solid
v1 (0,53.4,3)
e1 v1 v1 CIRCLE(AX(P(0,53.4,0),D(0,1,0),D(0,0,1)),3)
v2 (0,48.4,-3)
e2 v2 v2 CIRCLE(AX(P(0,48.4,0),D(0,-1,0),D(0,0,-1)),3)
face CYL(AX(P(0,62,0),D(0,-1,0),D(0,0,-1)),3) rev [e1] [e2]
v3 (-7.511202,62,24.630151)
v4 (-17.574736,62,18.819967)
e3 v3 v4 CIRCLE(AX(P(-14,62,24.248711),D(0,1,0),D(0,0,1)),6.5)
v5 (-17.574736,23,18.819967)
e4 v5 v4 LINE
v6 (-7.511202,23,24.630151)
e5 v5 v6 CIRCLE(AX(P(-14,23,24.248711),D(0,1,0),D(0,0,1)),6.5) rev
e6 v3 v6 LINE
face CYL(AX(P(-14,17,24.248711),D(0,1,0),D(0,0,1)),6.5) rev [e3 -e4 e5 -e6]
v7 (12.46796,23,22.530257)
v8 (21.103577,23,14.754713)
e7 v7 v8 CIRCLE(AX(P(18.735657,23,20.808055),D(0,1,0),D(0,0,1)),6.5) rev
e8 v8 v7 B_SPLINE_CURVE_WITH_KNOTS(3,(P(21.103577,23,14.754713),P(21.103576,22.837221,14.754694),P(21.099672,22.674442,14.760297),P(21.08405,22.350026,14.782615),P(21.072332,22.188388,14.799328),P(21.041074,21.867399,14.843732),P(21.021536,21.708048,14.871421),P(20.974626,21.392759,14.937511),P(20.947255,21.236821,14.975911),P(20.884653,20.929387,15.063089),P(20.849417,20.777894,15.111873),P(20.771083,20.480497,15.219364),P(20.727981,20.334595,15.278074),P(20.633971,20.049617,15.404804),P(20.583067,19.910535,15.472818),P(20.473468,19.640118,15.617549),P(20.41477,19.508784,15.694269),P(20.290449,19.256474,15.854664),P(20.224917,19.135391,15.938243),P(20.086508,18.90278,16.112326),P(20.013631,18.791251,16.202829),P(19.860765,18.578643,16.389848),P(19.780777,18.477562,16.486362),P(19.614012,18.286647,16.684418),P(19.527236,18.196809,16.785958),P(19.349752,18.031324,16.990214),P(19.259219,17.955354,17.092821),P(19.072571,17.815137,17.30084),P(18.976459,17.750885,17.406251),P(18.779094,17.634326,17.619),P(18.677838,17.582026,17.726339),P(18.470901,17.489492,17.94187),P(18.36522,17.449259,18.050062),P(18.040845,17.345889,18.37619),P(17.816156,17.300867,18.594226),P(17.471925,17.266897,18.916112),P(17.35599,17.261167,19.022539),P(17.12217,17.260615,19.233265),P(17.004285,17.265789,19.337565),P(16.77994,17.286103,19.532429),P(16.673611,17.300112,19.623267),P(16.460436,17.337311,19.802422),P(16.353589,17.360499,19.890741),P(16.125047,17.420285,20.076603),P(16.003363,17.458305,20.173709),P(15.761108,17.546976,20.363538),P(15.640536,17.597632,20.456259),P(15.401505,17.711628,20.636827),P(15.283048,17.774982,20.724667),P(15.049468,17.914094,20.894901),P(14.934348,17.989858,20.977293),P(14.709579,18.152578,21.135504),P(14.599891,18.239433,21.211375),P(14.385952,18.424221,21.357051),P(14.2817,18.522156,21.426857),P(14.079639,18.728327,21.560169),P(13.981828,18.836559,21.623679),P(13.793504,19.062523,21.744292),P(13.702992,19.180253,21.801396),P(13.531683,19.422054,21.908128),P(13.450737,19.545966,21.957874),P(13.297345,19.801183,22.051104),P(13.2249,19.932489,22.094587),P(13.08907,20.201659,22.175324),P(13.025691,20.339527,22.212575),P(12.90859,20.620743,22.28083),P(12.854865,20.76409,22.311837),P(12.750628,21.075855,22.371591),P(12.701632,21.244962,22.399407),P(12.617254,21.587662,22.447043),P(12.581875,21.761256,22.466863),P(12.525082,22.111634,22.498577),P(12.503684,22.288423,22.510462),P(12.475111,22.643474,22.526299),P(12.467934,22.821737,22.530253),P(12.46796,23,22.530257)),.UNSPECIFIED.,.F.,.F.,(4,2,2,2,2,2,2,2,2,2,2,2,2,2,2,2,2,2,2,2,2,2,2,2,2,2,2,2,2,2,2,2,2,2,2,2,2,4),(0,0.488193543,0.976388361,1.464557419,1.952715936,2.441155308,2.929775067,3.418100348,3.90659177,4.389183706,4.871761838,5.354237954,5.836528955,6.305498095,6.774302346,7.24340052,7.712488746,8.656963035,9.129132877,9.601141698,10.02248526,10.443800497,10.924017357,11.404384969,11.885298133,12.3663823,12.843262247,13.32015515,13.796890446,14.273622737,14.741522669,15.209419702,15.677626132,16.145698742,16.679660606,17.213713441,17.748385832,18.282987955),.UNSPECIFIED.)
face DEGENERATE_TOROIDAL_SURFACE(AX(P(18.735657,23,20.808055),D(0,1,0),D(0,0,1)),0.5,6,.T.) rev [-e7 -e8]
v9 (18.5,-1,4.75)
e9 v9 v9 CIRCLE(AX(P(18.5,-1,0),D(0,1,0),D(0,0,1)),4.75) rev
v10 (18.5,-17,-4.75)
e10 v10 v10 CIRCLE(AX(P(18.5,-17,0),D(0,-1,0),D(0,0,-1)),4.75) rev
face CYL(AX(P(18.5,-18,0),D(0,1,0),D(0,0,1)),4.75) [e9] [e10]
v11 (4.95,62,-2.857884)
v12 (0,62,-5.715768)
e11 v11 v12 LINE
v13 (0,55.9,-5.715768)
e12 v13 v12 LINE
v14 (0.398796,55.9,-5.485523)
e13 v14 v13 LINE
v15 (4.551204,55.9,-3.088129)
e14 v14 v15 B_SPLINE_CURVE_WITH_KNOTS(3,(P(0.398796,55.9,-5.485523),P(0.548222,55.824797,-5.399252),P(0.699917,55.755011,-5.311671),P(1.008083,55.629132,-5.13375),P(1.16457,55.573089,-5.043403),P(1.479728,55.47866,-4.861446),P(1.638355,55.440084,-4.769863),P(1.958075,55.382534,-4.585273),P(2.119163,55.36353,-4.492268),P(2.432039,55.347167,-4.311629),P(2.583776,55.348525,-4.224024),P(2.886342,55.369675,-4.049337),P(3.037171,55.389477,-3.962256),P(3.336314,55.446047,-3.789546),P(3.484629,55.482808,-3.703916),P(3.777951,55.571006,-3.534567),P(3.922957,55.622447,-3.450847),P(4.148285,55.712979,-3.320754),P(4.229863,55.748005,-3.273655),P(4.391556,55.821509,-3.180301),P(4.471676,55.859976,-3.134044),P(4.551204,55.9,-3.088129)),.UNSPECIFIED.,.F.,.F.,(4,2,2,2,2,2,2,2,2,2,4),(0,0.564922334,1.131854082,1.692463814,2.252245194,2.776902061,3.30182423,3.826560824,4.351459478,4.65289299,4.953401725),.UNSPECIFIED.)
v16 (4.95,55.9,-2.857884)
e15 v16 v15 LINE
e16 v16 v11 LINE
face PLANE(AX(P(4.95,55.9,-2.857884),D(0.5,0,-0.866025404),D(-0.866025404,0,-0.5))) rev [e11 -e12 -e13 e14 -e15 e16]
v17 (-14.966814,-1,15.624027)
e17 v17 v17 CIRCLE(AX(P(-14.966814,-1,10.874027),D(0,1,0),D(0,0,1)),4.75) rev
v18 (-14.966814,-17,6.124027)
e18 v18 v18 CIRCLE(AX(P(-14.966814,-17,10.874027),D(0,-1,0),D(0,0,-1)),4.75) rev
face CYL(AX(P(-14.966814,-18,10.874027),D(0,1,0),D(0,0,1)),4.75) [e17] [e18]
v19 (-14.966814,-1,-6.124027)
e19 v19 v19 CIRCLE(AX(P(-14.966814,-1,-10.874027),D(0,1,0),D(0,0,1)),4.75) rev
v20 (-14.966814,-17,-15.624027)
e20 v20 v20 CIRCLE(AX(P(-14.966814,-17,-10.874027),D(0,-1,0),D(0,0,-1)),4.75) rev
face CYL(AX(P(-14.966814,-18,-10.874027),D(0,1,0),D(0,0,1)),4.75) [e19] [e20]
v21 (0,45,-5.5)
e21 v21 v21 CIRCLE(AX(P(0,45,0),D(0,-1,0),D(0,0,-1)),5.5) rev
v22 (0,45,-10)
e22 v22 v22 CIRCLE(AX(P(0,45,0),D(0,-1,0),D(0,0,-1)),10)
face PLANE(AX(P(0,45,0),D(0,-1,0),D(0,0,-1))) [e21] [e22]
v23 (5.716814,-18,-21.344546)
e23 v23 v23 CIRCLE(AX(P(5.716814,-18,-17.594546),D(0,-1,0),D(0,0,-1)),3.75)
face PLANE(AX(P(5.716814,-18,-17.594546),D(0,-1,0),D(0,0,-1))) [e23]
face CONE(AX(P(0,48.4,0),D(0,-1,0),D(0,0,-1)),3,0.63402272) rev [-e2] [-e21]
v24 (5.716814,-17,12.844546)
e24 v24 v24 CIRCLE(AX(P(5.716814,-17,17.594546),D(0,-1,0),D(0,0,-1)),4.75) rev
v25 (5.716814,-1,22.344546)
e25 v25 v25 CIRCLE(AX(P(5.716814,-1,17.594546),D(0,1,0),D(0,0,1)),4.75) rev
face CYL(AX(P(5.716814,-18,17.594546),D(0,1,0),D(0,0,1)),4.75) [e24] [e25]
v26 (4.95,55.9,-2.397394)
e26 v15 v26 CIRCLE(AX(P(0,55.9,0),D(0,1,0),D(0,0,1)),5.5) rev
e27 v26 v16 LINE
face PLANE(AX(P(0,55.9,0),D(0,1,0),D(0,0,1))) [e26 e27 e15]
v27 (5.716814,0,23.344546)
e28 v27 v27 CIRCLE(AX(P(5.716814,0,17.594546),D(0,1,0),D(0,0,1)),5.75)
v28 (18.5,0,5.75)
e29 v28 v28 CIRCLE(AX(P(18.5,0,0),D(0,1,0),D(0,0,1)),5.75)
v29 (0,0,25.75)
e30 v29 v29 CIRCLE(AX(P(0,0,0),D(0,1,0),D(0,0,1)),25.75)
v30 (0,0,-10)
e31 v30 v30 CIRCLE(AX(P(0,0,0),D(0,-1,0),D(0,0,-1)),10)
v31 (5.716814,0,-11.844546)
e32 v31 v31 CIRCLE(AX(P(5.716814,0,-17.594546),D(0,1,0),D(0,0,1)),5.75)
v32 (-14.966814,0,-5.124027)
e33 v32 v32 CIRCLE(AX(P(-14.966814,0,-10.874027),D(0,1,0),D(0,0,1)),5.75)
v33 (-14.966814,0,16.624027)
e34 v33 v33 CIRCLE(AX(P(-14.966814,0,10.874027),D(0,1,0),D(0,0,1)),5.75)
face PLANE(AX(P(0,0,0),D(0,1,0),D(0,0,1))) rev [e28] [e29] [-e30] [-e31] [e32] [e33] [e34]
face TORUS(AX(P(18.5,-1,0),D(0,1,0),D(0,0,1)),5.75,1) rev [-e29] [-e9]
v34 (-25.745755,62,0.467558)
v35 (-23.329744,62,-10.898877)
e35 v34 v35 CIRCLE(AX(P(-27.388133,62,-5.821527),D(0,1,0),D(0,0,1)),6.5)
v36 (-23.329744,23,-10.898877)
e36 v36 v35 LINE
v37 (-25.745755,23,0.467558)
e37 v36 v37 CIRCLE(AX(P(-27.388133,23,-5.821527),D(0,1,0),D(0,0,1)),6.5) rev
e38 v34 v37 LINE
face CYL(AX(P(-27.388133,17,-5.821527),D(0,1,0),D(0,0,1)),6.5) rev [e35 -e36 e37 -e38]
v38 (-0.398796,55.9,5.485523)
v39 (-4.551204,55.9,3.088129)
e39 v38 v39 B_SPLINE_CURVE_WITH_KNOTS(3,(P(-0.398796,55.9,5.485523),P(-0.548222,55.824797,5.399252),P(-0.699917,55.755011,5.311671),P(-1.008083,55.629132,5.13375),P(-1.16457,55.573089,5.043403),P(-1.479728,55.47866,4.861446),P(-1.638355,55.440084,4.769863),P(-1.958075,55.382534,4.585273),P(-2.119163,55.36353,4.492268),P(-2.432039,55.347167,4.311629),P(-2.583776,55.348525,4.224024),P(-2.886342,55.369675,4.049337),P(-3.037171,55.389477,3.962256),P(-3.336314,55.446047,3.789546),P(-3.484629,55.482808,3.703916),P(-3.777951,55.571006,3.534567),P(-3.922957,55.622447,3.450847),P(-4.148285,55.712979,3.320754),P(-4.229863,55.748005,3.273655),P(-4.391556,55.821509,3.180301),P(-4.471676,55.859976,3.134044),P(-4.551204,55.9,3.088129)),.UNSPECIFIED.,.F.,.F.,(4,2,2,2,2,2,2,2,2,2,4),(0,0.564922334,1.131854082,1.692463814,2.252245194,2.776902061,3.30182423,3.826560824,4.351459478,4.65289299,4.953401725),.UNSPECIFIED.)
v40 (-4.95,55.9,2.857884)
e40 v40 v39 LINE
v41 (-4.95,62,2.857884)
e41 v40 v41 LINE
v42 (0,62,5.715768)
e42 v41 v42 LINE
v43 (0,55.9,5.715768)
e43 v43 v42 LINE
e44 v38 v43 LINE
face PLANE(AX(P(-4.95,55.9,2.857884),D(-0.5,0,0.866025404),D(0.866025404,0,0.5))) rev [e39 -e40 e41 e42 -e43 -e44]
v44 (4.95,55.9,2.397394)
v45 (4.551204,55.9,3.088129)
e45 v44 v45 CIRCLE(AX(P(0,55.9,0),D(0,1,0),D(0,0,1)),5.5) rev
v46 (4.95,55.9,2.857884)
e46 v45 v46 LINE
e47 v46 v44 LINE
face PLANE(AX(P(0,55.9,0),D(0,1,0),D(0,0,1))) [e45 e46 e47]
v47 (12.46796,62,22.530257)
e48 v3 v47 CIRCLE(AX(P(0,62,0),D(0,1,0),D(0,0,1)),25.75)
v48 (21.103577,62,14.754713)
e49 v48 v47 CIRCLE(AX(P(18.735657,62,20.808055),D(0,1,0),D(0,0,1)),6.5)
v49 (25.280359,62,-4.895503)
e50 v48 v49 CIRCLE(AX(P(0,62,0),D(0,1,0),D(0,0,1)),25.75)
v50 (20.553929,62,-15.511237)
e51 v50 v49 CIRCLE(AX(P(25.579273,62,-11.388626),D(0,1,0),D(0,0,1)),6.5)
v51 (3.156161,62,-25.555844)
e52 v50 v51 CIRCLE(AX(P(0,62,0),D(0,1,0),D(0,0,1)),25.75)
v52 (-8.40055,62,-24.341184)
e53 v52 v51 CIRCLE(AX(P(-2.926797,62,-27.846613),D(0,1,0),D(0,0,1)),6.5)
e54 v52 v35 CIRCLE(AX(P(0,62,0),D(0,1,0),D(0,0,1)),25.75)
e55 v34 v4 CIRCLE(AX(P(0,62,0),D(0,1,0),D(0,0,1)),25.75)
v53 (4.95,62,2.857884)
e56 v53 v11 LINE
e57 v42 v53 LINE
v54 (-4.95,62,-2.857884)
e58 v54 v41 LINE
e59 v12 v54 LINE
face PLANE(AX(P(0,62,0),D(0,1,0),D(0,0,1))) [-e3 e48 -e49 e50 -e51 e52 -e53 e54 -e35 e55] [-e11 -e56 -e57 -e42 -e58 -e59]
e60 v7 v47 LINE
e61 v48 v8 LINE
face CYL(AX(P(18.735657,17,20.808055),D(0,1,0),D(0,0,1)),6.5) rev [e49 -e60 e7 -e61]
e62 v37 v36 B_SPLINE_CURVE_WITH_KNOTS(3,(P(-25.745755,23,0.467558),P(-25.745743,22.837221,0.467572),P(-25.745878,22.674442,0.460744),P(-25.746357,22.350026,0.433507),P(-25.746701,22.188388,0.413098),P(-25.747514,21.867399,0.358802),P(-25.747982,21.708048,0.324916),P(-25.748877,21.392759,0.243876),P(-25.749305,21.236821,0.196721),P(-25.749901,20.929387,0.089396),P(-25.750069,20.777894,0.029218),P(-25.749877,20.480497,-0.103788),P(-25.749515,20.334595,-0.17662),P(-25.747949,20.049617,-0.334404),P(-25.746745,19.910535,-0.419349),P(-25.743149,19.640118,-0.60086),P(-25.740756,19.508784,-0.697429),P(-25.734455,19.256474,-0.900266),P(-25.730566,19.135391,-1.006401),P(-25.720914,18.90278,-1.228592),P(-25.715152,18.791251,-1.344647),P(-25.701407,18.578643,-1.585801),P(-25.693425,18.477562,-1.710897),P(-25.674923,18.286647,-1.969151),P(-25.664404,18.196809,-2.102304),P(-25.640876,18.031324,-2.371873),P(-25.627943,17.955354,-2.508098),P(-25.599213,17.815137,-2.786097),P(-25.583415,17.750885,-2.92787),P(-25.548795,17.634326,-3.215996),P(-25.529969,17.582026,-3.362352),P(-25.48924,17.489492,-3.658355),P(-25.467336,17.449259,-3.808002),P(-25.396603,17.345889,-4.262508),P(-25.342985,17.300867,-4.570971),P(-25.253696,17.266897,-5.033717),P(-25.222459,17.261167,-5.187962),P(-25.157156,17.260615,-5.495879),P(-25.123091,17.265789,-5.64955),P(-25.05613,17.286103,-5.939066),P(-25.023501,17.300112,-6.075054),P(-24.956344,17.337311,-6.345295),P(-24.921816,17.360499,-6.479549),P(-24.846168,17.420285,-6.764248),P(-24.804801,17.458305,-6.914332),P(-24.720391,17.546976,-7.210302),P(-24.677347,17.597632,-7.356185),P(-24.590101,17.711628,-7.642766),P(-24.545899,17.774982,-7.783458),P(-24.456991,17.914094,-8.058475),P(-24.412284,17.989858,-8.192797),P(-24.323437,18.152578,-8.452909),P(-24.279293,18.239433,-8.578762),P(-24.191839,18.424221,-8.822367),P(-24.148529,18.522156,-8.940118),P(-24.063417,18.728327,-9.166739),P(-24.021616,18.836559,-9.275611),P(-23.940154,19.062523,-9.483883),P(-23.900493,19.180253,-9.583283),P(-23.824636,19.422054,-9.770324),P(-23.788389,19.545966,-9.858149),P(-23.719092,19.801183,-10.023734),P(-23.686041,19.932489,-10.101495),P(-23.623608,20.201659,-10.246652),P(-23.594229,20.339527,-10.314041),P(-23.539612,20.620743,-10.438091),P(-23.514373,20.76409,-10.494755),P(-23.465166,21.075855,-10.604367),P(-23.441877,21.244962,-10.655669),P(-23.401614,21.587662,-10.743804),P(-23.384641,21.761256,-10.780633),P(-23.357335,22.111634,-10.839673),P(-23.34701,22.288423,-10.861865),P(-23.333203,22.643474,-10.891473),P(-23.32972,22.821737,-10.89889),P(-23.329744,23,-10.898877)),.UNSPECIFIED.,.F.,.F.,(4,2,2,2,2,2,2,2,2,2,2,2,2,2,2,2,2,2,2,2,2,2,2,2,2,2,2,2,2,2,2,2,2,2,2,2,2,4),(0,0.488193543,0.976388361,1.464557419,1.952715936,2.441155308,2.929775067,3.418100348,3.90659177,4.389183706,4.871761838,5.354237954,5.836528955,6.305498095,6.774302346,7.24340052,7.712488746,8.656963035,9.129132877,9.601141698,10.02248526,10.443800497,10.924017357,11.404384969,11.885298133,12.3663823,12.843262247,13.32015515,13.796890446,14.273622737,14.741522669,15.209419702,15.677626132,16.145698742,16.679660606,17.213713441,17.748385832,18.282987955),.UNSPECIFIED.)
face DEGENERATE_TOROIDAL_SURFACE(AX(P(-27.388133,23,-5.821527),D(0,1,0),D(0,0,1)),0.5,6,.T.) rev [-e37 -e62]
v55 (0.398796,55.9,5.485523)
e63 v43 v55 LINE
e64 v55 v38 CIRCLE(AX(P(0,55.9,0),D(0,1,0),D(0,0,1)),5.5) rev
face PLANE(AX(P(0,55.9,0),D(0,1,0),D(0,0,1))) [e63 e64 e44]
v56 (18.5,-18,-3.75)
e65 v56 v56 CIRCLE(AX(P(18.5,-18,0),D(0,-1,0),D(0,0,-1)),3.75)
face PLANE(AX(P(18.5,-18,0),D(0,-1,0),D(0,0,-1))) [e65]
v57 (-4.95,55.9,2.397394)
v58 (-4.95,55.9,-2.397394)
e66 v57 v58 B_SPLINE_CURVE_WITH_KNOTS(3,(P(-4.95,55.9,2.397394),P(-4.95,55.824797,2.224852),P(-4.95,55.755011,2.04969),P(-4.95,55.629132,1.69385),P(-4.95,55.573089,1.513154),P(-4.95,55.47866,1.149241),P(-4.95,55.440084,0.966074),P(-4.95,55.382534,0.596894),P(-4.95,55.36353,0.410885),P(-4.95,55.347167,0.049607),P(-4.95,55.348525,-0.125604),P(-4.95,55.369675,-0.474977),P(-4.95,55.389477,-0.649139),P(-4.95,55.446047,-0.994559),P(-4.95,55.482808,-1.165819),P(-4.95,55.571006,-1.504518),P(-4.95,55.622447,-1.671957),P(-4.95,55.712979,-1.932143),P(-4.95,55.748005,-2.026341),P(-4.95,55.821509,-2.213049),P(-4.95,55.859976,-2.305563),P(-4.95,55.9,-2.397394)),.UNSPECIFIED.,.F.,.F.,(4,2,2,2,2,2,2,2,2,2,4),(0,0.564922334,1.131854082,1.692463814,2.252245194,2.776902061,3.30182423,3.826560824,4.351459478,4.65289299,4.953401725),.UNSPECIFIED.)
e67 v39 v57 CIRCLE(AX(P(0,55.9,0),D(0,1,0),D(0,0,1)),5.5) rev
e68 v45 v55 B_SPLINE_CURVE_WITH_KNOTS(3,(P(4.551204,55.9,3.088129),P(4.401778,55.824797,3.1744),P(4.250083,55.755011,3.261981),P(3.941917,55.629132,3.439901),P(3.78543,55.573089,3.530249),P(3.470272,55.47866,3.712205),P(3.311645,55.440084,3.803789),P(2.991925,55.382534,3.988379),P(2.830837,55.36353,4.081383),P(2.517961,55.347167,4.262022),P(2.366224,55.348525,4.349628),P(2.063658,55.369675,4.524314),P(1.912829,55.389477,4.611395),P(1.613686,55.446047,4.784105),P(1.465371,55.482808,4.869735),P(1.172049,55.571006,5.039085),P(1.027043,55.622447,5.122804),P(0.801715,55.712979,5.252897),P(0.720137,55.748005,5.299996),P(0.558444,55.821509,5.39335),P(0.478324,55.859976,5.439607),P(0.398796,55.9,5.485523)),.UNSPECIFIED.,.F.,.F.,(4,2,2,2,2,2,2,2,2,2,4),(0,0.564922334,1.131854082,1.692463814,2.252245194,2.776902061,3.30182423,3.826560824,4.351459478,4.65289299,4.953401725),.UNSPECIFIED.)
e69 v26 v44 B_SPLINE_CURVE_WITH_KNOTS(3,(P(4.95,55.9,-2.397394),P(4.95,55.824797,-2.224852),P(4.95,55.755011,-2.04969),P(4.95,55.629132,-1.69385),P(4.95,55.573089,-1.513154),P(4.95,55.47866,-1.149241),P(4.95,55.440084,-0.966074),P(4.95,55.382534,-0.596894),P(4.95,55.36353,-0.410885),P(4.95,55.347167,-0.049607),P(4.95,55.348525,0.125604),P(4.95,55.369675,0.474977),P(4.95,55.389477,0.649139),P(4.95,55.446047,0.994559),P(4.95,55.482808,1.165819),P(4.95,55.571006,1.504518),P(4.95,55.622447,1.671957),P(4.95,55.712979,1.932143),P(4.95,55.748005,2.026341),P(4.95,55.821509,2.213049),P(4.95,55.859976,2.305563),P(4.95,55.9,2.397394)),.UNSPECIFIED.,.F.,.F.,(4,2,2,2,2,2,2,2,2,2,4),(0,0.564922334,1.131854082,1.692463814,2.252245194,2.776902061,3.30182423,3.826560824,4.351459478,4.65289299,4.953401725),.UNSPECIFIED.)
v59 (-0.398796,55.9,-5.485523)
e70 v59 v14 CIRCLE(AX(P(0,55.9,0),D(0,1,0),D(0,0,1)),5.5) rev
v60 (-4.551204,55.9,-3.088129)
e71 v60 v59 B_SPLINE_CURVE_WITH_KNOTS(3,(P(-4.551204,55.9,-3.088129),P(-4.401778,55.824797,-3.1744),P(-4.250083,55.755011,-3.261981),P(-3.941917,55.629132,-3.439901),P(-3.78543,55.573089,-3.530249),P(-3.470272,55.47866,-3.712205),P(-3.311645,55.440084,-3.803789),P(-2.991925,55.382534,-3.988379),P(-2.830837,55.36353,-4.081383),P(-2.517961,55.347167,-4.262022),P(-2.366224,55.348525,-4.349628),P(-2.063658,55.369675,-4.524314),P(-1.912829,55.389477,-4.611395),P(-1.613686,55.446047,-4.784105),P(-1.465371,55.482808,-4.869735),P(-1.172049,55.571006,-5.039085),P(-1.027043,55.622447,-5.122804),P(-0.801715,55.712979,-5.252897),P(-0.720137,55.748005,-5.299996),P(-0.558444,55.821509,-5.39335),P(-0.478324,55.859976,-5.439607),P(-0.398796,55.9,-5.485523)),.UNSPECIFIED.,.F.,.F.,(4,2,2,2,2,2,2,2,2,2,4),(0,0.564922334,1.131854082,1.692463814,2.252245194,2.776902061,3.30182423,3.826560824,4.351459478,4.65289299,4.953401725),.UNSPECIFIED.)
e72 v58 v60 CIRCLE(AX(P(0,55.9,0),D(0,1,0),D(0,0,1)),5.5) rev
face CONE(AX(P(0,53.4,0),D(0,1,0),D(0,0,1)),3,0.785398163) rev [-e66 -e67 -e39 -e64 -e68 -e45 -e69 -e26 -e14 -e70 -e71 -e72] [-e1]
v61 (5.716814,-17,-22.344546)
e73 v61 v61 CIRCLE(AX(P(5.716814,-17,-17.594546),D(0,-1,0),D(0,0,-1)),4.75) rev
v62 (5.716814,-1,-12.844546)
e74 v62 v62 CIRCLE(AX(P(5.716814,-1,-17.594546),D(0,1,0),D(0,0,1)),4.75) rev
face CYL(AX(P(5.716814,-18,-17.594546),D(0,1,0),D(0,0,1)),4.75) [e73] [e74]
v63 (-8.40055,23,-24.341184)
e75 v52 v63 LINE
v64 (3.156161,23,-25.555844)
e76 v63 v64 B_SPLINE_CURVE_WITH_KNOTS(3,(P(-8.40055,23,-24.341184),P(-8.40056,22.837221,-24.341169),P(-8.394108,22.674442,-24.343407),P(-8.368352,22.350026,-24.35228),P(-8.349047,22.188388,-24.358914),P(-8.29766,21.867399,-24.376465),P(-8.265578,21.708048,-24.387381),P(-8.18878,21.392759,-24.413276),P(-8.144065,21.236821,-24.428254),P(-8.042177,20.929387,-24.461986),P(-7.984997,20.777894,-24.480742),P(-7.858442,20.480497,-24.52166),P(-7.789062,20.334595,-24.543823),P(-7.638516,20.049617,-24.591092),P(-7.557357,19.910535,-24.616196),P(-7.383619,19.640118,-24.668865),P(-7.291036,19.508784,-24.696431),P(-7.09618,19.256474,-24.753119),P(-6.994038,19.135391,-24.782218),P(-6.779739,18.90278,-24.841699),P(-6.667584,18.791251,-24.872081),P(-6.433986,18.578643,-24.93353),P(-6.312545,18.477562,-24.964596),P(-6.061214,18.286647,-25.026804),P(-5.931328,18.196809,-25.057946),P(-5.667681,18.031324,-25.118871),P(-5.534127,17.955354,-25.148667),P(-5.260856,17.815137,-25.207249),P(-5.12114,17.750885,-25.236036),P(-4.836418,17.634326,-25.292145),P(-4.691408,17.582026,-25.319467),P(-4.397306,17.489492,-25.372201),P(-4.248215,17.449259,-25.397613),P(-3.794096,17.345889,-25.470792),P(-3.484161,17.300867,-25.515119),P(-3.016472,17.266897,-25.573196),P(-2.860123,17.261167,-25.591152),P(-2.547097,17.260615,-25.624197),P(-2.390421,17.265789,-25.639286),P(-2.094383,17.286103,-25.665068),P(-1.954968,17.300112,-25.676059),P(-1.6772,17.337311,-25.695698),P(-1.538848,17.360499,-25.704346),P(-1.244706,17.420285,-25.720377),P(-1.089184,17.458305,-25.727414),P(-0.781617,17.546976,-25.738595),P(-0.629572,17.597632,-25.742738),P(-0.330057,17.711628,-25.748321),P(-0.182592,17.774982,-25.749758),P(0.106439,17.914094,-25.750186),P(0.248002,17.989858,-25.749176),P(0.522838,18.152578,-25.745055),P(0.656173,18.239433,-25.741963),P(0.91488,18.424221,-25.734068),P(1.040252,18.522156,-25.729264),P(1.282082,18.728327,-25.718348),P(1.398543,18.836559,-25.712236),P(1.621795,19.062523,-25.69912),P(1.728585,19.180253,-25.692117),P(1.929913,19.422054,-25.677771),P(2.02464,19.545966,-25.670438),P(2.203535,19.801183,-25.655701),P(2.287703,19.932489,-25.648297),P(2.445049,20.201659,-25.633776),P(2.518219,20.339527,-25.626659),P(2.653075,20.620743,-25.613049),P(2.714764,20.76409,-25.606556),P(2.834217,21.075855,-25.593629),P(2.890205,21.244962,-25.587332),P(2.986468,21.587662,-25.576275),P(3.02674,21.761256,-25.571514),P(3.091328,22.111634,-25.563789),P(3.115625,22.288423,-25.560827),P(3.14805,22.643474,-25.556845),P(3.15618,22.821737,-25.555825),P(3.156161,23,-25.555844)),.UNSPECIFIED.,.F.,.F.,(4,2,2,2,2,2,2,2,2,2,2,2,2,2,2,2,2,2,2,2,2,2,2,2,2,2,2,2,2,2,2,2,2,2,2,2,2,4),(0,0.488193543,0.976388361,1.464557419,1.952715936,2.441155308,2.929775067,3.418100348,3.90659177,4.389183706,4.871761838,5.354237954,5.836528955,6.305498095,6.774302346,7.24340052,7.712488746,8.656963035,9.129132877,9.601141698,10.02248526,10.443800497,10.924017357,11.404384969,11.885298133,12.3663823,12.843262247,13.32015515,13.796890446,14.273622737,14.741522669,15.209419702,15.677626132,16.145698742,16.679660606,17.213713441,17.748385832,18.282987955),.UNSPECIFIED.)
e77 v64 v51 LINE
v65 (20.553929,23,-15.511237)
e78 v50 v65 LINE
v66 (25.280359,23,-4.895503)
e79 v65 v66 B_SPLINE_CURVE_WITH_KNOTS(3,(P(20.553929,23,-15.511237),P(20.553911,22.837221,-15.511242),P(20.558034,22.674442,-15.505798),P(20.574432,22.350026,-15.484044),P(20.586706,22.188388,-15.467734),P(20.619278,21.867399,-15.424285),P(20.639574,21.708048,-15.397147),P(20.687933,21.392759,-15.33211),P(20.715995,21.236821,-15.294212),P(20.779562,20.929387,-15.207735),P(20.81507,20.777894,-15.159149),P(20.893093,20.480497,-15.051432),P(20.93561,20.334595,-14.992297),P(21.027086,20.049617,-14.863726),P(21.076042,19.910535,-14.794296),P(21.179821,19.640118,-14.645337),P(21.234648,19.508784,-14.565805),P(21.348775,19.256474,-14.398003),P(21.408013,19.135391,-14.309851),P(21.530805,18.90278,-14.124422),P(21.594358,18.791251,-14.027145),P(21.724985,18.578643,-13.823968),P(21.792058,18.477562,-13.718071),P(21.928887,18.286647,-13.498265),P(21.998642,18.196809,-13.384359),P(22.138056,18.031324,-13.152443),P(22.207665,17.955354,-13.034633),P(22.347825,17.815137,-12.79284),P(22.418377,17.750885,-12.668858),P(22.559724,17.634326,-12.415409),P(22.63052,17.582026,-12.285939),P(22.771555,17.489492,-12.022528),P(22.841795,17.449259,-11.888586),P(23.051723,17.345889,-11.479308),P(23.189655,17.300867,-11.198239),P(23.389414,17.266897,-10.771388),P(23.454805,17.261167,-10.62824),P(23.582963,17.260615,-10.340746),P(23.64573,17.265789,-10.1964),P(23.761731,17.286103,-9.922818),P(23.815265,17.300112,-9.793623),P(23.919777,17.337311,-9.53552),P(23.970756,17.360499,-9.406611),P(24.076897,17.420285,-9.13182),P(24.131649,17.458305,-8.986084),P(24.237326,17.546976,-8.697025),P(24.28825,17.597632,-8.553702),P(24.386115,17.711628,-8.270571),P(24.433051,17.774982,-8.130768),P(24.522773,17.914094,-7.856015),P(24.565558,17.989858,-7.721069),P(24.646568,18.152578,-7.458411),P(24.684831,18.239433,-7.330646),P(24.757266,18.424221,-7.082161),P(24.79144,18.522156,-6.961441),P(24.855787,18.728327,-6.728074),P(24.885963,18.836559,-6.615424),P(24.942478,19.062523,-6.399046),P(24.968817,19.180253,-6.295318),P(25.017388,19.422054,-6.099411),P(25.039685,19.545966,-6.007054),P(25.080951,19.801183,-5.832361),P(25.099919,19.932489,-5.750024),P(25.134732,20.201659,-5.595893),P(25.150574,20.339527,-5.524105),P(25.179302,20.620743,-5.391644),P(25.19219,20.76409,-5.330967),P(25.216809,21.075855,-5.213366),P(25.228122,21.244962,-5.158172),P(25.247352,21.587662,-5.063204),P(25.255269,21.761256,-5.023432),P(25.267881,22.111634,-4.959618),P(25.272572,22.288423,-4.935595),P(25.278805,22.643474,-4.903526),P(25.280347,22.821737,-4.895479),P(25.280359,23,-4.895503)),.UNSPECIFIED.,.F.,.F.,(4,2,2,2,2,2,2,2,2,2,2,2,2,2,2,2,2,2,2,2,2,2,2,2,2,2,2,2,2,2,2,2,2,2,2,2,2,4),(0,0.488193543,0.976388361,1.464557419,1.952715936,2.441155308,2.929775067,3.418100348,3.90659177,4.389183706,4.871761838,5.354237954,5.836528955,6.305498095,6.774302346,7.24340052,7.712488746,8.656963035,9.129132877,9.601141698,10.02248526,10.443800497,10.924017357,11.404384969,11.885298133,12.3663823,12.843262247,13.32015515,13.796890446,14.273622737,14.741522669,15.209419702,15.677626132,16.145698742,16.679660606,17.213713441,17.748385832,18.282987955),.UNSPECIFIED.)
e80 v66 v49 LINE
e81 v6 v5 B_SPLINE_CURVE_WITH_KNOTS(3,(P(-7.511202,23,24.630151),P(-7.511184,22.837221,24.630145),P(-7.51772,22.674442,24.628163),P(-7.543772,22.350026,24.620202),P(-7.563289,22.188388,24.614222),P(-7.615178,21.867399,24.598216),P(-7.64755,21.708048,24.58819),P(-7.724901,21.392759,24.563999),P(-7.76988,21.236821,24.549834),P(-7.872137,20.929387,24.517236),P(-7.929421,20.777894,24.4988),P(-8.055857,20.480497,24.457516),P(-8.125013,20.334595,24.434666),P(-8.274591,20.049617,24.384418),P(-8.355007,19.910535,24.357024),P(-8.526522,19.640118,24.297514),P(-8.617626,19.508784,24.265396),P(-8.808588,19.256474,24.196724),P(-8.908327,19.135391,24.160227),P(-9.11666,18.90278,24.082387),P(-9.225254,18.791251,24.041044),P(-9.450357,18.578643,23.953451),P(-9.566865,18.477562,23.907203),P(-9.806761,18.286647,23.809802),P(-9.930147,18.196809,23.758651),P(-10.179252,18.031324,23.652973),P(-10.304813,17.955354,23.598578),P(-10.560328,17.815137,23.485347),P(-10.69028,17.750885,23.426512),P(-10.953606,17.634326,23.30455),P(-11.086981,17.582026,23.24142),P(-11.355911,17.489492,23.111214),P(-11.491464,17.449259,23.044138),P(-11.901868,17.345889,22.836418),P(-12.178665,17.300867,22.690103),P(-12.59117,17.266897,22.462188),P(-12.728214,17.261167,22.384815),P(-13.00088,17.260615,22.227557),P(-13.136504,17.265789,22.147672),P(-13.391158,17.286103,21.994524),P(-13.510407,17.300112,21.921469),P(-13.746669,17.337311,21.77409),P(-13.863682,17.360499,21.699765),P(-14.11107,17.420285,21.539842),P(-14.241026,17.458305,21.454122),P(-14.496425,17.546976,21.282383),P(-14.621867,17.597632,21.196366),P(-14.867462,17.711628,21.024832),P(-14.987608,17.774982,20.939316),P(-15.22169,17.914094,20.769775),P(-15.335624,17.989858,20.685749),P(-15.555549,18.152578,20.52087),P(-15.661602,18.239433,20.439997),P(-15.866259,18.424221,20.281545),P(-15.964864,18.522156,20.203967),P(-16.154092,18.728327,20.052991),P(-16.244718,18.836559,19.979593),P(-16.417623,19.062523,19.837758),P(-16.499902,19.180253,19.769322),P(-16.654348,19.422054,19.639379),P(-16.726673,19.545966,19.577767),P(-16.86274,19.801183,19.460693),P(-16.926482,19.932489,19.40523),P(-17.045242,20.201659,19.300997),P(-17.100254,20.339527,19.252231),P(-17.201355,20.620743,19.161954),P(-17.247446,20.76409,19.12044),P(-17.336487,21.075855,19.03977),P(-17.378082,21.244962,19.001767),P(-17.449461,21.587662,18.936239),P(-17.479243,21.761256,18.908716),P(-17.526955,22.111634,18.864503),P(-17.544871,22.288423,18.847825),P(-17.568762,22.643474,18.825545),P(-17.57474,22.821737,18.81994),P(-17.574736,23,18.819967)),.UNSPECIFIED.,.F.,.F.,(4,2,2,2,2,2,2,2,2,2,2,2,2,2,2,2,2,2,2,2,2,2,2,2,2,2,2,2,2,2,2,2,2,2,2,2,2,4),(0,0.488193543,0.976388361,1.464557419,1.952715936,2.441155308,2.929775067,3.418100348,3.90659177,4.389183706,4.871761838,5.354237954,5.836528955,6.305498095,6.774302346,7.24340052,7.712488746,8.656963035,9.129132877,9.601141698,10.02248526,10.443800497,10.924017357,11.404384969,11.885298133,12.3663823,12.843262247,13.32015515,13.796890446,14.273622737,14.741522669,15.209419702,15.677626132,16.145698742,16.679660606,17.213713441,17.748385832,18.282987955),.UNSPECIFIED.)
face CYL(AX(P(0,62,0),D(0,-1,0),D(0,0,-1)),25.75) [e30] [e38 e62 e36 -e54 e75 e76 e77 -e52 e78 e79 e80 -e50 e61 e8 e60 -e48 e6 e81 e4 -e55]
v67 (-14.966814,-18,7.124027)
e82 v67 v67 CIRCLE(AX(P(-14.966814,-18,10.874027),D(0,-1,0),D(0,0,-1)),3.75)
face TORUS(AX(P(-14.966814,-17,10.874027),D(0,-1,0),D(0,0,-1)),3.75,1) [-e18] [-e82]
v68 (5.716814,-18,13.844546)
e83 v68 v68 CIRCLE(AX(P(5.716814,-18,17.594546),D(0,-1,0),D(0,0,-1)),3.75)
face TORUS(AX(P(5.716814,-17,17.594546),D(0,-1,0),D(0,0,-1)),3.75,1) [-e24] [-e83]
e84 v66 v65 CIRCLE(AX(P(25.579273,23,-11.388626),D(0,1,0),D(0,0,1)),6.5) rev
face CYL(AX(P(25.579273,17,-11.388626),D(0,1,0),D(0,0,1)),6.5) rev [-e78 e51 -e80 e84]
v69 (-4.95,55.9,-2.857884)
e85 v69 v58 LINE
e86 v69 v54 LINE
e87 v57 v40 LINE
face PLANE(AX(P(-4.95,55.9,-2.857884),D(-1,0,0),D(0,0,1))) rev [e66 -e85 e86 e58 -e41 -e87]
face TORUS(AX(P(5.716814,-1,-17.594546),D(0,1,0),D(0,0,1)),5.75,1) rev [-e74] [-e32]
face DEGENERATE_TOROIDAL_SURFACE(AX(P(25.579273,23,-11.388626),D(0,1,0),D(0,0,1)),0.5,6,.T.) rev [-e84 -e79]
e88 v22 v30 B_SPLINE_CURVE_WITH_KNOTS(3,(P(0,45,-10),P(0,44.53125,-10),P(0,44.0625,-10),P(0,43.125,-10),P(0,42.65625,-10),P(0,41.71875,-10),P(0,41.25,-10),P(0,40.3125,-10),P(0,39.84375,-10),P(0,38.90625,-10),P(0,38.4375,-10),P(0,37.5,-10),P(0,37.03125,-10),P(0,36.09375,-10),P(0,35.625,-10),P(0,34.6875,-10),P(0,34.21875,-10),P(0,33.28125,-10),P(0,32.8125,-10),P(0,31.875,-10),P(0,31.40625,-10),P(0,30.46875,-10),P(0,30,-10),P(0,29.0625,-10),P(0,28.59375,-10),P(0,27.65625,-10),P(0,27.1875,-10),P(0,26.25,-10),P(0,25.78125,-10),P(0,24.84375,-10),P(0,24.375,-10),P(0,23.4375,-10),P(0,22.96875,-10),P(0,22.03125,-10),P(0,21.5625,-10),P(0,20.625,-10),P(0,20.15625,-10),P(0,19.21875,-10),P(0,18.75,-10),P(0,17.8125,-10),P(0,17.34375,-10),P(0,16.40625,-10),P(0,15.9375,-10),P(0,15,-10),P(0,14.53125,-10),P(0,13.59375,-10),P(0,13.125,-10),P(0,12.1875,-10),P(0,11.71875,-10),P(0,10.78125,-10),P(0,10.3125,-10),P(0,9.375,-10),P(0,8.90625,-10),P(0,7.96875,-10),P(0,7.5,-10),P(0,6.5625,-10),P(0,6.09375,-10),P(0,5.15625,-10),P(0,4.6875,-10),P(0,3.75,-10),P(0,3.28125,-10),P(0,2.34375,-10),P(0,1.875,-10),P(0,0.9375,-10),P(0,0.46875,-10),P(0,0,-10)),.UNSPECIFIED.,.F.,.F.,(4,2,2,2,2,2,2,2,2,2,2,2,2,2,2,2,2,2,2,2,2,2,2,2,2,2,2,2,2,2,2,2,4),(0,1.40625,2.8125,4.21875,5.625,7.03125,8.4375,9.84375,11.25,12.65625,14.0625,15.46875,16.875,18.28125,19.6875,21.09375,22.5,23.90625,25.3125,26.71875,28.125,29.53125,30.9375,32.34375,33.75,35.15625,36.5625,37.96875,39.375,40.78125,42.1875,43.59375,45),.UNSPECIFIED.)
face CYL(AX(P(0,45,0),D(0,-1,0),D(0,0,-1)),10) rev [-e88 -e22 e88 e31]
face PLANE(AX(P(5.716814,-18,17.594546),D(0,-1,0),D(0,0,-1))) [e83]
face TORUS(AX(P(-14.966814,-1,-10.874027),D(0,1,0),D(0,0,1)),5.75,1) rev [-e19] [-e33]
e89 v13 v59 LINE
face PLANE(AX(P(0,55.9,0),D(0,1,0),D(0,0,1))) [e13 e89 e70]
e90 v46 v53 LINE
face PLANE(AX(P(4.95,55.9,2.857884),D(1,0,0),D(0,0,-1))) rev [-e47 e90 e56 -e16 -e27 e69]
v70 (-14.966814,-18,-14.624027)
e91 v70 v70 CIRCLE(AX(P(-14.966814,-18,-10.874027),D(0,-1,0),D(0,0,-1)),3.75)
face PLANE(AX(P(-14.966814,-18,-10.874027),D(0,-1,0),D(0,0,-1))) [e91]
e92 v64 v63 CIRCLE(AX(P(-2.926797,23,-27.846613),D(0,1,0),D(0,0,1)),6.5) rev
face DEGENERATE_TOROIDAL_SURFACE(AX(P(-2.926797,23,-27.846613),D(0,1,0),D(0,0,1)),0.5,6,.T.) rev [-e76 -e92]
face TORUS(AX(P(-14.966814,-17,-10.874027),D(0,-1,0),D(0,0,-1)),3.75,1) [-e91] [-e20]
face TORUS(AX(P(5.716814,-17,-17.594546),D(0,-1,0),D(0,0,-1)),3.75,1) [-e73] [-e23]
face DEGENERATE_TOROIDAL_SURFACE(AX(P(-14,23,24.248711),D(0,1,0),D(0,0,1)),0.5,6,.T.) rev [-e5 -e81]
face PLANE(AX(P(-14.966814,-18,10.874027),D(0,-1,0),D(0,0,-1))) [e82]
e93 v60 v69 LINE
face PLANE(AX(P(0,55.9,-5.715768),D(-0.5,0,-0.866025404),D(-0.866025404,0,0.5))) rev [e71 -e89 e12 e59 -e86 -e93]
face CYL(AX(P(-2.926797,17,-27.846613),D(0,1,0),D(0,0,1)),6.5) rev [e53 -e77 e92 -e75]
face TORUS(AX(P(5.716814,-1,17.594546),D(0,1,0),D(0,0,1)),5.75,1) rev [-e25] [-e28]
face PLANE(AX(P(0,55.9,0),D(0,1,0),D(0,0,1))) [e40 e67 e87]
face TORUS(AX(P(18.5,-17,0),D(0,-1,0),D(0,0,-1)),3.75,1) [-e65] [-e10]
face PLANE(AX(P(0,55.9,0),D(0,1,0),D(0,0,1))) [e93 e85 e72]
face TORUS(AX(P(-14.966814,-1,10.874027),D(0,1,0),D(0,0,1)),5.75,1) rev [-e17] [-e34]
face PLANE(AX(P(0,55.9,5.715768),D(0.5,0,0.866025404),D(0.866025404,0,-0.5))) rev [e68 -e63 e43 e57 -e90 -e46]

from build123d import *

# Parameters (mm, degrees)
SKETCH1_R           = 25.75
BOSS_EXTRUDE1_DEPTH = 62
SKETCH2_R           = 4.75
BOSS_EXTRUDE2_DEPTH = 18
FILLET1_R           = 1
FILLET2_R           = 1
CUT_EXTRUDE1_DEPTH  = 6.1
SKETCH4_R           = 10
CUT_EXTRUDE2_DEPTH  = 45
SKETCH5_R           = 3
CUT_EXTRUDE3_DEPTH  = 73.767609553
CHAMFER2_SIZE       = 2.5
CHAMFER2_SIZE2      = 3.4
SKETCH6_R           = 6.5
CUT_EXTRUDE4_DEPTH  = 45
FILLET3_R           = 6
CHAMFER3_SIZE       = 2.5


with BuildPart() as part:
    # Sketch1 → Boss-Extrude1 (new body)
    with BuildSketch(Plane(origin=(0, 0, 0), x_dir=(1, 0, 0), z_dir=(0, 1, 0))):
        with Locations(Location((0, 0, 0), (0, 0, 270))):
            Circle(SKETCH1_R)
    extrude(amount=BOSS_EXTRUDE1_DEPTH)

    # Sketch2 → Boss-Extrude2 (add)
    with BuildSketch(Plane.XZ):
        with Locations(Location((18.5, 0, 0), (0, 0, 90))):
            Circle(SKETCH2_R)
        with Locations(Location((5.716814396, -17.594545551, 0), (0, 0, 90))):
            Circle(SKETCH2_R)
        with Locations(Location((-14.966814396, -10.874027167, 0), (0, 0, 90))):
            Circle(SKETCH2_R)
        with Locations(Location((-14.966814396, 10.874027167, 0), (0, 0, 90))):
            Circle(SKETCH2_R)
        with Locations(Location((5.716814396, 17.594545551, 0), (0, 0, 90))):
            Circle(SKETCH2_R)
    extrude(amount=BOSS_EXTRUDE2_DEPTH)

    # Fillet1
    fillet1_edges = [part.edges().sort_by_distance(p)[0] for p in [
        (-14.966814396, 0, -15.624027167),
        (-14.966814396, 0, 6.124027167),
        (5.716814396, 0, 12.844545551),
        (18.5, 0, -4.75),
        (5.716814396, 0, -22.344545551),
    ]]
    fillet(fillet1_edges, radius=FILLET1_R)

    # Fillet2
    fillet2_edges = [part.edges().sort_by_distance(p)[0] for p in [
        (-14.966814396, -18, -15.624027167),
        (-14.966814396, -18, 6.124027167),
        (5.716814396, -18, 12.844545551),
        (18.5, -18, -4.75),
        (5.716814396, -18, -22.344545551),
    ]]
    fillet(fillet2_edges, radius=FILLET2_R)

    # Sketch3 → Cut-Extrude1 (cut)
    with BuildSketch(Plane(origin=(0, 62, 0), x_dir=(1, 0, 0), z_dir=(0, 1, 0))):
        Polygon((0, -5.715767665), (4.95, -2.857883832), (4.95, 2.857883832), (0, 5.715767665), (-4.95, 2.857883832), (-4.95, -2.857883832), align=None)
    extrude(amount=-CUT_EXTRUDE1_DEPTH, mode=Mode.SUBTRACT)

    # Sketch4 → Cut-Extrude2 (cut)
    with BuildSketch(Plane.XZ):
        with Locations(Location((0, 0, 0), (0, 0, 270))):
            Circle(SKETCH4_R)
    extrude(amount=-CUT_EXTRUDE2_DEPTH, mode=Mode.SUBTRACT)

    # Sketch5 → Cut-Extrude3 (cut, through all)
    with BuildSketch(Plane.XZ.offset(-45)):
        with Locations(Location((0, 0, 0), (0, 0, 270))):
            Circle(SKETCH5_R)
    extrude(amount=-CUT_EXTRUDE3_DEPTH, mode=Mode.SUBTRACT)

    # Chamfer2
    chamfer2_edges = [part.edges().sort_by_distance(p)[0] for p in [
        (0, 45, 3),
    ]]
    chamfer2_side = [part.faces().sort_by_distance(p)[0] for p in [
        (0, 45, 9.717157288),
    ]]
    chamfer(chamfer2_edges, length=CHAMFER2_SIZE, length2=CHAMFER2_SIZE2, reference=chamfer2_side[0])

    # Sketch6 → Cut-Extrude4 (cut)
    with BuildSketch(Plane(origin=(0, 62, 0), x_dir=(1, 0, 0), z_dir=(0, 1, 0))):
        with Locations((-14, -24.248711306)):
            Circle(SKETCH6_R)
        with Locations((-27.388132821, 5.821527343)):
            Circle(SKETCH6_R)
        with Locations((-2.926796971, 27.84661307)):
            Circle(SKETCH6_R)
        with Locations((25.579272814, 11.388626006)):
            Circle(SKETCH6_R)
        with Locations((18.735656978, -20.808055113)):
            Circle(SKETCH6_R)
    extrude(amount=-CUT_EXTRUDE4_DEPTH, mode=Mode.SUBTRACT)

    # Fillet3
    # the kernel refuses this fillet: 6 mm, written as the material it adds along each edge
    with BuildSketch(Plane(origin=(-14, 17, 24.248711306), x_dir=(-0.5027182271719127, 0, 0.8644503363809452), z_dir=(0.8644503363809452, 0, 0.5027182271719127))) as fillet3_piece_1_section:
        with BuildLine():
            CenterArc((6.5 - FILLET3_R, -FILLET3_R), FILLET3_R, 0, 90)
            Line((6.5, -FILLET3_R), (6.5, 0))
            Line((6.5, 0), (6.5 - FILLET3_R, 0))
        make_face()
    fillet3_piece_1 = revolve(axis=Axis((-14, 17, 24.248711306), (0, -1, 0)), revolution_arc=359.64, mode=Mode.PRIVATE)
    fillet3_piece_1 = fillet3_piece_1 & Plane(origin=(0, 19.401898433, 0), x_dir=(0, 0, 1), z_dir=(0, -1, 0)) * Cylinder(25.75, 26, mode=Mode.PRIVATE)
    add(fillet3_piece_1)
    with BuildSketch(Plane(origin=(-27.388132821, 17, -5.821527343), x_dir=(-0.9774896010068019, 0, -0.21098360107734276), z_dir=(-0.21098360107734276, 0, 0.9774896010068019))) as fillet3_piece_2_section:
        with BuildLine():
            CenterArc((6.5 - FILLET3_R, -FILLET3_R), FILLET3_R, 0, 90)
            Line((6.5, -FILLET3_R), (6.5, 0))
            Line((6.5, 0), (6.5 - FILLET3_R, 0))
        make_face()
    fillet3_piece_2 = revolve(axis=Axis((-27.388132821, 17, -5.821527343), (0, -1, 0)), revolution_arc=359.64, mode=Mode.PRIVATE)
    fillet3_piece_2 = fillet3_piece_2 & Plane(origin=(0, 19.401898433, 0), x_dir=(0, 0, 1), z_dir=(0, -1, 0)) * Cylinder(25.75, 26, mode=Mode.PRIVATE)
    add(fillet3_piece_2)
    with BuildSketch(Plane(origin=(-2.926796971, 17, -27.84661307), x_dir=(-0.1076523249817097, 0, -0.9941886022913521), z_dir=(0.9941886022913521, 0, -0.1076523249817097))) as fillet3_piece_3_section:
        with BuildLine():
            CenterArc((6.5 - FILLET3_R, FILLET3_R), FILLET3_R, 270, 90)
            Line((6.5, FILLET3_R), (6.5, 0))
            Line((6.5, 0), (6.5 - FILLET3_R, 0))
        make_face()
    fillet3_piece_3 = revolve(axis=Axis((-2.926796971, 17, -27.84661307), (0, 1, 0)), revolution_arc=359.64, mode=Mode.PRIVATE)
    fillet3_piece_3 = fillet3_piece_3 & Plane(origin=(0, 19.401898433, 0), x_dir=(0, 0, 1), z_dir=(0, -1, 0)) * Cylinder(25.75, 26, mode=Mode.PRIVATE)
    add(fillet3_piece_3)
    with BuildSketch(Plane(origin=(25.579272814, 17, -11.388626006), x_dir=(0.9122631507322384, 0, -0.40960461889008193), z_dir=(0.40960461889008193, 0, 0.9122631507322384))) as fillet3_piece_4_section:
        with BuildLine():
            CenterArc((6.5 - FILLET3_R, FILLET3_R), FILLET3_R, 270, 90)
            Line((6.5, FILLET3_R), (6.5, 0))
            Line((6.5, 0), (6.5 - FILLET3_R, 0))
        make_face()
    fillet3_piece_4 = revolve(axis=Axis((25.579272814, 17, -11.388626006), (0, 1, 0)), revolution_arc=359.64, mode=Mode.PRIVATE)
    fillet3_piece_4 = fillet3_piece_4 & Plane(origin=(0, 19.401898433, 0), x_dir=(0, 0, 1), z_dir=(0, -1, 0)) * Cylinder(25.75, 27, mode=Mode.PRIVATE)
    add(fillet3_piece_4)
    with BuildSketch(Plane(origin=(18.735656978, 17, 20.808055113), x_dir=(0.6714619588183017, 0, 0.7410390258683339), z_dir=(-0.7410390258683339, 0, 0.6714619588183017))) as fillet3_piece_5_section:
        with BuildLine():
            CenterArc((6.5 - FILLET3_R, FILLET3_R), FILLET3_R, 270, 90)
            Line((6.5, FILLET3_R), (6.5, 0))
            Line((6.5, 0), (6.5 - FILLET3_R, 0))
        make_face()
    fillet3_piece_5 = revolve(axis=Axis((18.735656978, 17, 20.808055113), (0, 1, 0)), revolution_arc=359.64, mode=Mode.PRIVATE)
    fillet3_piece_5 = fillet3_piece_5 & Plane(origin=(0, 19.401898433, 0), x_dir=(0, 0, 1), z_dir=(0, -1, 0)) * Cylinder(25.75, 26, mode=Mode.PRIVATE)
    add(fillet3_piece_5)

    # Chamfer3
    # the kernel refuses this chamfer: 2.5 mm, written as the material it takes off along each edge
    with BuildSketch(Plane(origin=(0, 55.9, 0), x_dir=(0, 0, -1), z_dir=(-1, 0, 0))) as chamfer3_piece_1_section:
        Polygon((3 + CHAMFER3_SIZE, 0), (3, CHAMFER3_SIZE), (3, 0), align=None)
    chamfer3_piece_1 = revolve(axis=Axis((0, 55.9, 0), (0, -1, 0)), mode=Mode.PRIVATE)
    chamfer3_piece_1 = split(chamfer3_piece_1, bisect_by=Plane(origin=(0.647838444, 54.680351136, 5.341737965), z_dir=(-0.4999999999999998, 0, -0.8660254037844388)), keep=Keep.TOP, mode=Mode.PRIVATE)
    chamfer3_piece_1 = split(chamfer3_piece_1, bisect_by=Plane(origin=(-0.647838444, 54.680351136, 5.341737965), z_dir=(0.5000000000000001, 0, -0.8660254037844386)), keep=Keep.TOP, mode=Mode.PRIVATE)
    chamfer3_piece_1 = split(chamfer3_piece_1, bisect_by=Plane(origin=(-4.95, 54.680351136, 4.219648864), z_dir=(1, 0, 0)), keep=Keep.TOP, mode=Mode.PRIVATE)
    chamfer3_piece_1 = split(chamfer3_piece_1, bisect_by=Plane(origin=(-4.302161556, 54.680351136, -3.231913533), z_dir=(0.49999999999999983, 0, 0.8660254037844388)), keep=Keep.TOP, mode=Mode.PRIVATE)
    chamfer3_piece_1 = split(chamfer3_piece_1, bisect_by=Plane(origin=(4.302161556, 54.680351136, -3.231913533), z_dir=(-0.5000000000000001, 0, 0.8660254037844386)), keep=Keep.TOP, mode=Mode.PRIVATE)
    chamfer3_piece_1 = split(chamfer3_piece_1, bisect_by=Plane(origin=(4.95, 54.680351136, 4.219648864), z_dir=(-1, 0, 0)), keep=Keep.TOP, mode=Mode.PRIVATE)
    add(chamfer3_piece_1, mode=Mode.SUBTRACT)


solid = part.part
